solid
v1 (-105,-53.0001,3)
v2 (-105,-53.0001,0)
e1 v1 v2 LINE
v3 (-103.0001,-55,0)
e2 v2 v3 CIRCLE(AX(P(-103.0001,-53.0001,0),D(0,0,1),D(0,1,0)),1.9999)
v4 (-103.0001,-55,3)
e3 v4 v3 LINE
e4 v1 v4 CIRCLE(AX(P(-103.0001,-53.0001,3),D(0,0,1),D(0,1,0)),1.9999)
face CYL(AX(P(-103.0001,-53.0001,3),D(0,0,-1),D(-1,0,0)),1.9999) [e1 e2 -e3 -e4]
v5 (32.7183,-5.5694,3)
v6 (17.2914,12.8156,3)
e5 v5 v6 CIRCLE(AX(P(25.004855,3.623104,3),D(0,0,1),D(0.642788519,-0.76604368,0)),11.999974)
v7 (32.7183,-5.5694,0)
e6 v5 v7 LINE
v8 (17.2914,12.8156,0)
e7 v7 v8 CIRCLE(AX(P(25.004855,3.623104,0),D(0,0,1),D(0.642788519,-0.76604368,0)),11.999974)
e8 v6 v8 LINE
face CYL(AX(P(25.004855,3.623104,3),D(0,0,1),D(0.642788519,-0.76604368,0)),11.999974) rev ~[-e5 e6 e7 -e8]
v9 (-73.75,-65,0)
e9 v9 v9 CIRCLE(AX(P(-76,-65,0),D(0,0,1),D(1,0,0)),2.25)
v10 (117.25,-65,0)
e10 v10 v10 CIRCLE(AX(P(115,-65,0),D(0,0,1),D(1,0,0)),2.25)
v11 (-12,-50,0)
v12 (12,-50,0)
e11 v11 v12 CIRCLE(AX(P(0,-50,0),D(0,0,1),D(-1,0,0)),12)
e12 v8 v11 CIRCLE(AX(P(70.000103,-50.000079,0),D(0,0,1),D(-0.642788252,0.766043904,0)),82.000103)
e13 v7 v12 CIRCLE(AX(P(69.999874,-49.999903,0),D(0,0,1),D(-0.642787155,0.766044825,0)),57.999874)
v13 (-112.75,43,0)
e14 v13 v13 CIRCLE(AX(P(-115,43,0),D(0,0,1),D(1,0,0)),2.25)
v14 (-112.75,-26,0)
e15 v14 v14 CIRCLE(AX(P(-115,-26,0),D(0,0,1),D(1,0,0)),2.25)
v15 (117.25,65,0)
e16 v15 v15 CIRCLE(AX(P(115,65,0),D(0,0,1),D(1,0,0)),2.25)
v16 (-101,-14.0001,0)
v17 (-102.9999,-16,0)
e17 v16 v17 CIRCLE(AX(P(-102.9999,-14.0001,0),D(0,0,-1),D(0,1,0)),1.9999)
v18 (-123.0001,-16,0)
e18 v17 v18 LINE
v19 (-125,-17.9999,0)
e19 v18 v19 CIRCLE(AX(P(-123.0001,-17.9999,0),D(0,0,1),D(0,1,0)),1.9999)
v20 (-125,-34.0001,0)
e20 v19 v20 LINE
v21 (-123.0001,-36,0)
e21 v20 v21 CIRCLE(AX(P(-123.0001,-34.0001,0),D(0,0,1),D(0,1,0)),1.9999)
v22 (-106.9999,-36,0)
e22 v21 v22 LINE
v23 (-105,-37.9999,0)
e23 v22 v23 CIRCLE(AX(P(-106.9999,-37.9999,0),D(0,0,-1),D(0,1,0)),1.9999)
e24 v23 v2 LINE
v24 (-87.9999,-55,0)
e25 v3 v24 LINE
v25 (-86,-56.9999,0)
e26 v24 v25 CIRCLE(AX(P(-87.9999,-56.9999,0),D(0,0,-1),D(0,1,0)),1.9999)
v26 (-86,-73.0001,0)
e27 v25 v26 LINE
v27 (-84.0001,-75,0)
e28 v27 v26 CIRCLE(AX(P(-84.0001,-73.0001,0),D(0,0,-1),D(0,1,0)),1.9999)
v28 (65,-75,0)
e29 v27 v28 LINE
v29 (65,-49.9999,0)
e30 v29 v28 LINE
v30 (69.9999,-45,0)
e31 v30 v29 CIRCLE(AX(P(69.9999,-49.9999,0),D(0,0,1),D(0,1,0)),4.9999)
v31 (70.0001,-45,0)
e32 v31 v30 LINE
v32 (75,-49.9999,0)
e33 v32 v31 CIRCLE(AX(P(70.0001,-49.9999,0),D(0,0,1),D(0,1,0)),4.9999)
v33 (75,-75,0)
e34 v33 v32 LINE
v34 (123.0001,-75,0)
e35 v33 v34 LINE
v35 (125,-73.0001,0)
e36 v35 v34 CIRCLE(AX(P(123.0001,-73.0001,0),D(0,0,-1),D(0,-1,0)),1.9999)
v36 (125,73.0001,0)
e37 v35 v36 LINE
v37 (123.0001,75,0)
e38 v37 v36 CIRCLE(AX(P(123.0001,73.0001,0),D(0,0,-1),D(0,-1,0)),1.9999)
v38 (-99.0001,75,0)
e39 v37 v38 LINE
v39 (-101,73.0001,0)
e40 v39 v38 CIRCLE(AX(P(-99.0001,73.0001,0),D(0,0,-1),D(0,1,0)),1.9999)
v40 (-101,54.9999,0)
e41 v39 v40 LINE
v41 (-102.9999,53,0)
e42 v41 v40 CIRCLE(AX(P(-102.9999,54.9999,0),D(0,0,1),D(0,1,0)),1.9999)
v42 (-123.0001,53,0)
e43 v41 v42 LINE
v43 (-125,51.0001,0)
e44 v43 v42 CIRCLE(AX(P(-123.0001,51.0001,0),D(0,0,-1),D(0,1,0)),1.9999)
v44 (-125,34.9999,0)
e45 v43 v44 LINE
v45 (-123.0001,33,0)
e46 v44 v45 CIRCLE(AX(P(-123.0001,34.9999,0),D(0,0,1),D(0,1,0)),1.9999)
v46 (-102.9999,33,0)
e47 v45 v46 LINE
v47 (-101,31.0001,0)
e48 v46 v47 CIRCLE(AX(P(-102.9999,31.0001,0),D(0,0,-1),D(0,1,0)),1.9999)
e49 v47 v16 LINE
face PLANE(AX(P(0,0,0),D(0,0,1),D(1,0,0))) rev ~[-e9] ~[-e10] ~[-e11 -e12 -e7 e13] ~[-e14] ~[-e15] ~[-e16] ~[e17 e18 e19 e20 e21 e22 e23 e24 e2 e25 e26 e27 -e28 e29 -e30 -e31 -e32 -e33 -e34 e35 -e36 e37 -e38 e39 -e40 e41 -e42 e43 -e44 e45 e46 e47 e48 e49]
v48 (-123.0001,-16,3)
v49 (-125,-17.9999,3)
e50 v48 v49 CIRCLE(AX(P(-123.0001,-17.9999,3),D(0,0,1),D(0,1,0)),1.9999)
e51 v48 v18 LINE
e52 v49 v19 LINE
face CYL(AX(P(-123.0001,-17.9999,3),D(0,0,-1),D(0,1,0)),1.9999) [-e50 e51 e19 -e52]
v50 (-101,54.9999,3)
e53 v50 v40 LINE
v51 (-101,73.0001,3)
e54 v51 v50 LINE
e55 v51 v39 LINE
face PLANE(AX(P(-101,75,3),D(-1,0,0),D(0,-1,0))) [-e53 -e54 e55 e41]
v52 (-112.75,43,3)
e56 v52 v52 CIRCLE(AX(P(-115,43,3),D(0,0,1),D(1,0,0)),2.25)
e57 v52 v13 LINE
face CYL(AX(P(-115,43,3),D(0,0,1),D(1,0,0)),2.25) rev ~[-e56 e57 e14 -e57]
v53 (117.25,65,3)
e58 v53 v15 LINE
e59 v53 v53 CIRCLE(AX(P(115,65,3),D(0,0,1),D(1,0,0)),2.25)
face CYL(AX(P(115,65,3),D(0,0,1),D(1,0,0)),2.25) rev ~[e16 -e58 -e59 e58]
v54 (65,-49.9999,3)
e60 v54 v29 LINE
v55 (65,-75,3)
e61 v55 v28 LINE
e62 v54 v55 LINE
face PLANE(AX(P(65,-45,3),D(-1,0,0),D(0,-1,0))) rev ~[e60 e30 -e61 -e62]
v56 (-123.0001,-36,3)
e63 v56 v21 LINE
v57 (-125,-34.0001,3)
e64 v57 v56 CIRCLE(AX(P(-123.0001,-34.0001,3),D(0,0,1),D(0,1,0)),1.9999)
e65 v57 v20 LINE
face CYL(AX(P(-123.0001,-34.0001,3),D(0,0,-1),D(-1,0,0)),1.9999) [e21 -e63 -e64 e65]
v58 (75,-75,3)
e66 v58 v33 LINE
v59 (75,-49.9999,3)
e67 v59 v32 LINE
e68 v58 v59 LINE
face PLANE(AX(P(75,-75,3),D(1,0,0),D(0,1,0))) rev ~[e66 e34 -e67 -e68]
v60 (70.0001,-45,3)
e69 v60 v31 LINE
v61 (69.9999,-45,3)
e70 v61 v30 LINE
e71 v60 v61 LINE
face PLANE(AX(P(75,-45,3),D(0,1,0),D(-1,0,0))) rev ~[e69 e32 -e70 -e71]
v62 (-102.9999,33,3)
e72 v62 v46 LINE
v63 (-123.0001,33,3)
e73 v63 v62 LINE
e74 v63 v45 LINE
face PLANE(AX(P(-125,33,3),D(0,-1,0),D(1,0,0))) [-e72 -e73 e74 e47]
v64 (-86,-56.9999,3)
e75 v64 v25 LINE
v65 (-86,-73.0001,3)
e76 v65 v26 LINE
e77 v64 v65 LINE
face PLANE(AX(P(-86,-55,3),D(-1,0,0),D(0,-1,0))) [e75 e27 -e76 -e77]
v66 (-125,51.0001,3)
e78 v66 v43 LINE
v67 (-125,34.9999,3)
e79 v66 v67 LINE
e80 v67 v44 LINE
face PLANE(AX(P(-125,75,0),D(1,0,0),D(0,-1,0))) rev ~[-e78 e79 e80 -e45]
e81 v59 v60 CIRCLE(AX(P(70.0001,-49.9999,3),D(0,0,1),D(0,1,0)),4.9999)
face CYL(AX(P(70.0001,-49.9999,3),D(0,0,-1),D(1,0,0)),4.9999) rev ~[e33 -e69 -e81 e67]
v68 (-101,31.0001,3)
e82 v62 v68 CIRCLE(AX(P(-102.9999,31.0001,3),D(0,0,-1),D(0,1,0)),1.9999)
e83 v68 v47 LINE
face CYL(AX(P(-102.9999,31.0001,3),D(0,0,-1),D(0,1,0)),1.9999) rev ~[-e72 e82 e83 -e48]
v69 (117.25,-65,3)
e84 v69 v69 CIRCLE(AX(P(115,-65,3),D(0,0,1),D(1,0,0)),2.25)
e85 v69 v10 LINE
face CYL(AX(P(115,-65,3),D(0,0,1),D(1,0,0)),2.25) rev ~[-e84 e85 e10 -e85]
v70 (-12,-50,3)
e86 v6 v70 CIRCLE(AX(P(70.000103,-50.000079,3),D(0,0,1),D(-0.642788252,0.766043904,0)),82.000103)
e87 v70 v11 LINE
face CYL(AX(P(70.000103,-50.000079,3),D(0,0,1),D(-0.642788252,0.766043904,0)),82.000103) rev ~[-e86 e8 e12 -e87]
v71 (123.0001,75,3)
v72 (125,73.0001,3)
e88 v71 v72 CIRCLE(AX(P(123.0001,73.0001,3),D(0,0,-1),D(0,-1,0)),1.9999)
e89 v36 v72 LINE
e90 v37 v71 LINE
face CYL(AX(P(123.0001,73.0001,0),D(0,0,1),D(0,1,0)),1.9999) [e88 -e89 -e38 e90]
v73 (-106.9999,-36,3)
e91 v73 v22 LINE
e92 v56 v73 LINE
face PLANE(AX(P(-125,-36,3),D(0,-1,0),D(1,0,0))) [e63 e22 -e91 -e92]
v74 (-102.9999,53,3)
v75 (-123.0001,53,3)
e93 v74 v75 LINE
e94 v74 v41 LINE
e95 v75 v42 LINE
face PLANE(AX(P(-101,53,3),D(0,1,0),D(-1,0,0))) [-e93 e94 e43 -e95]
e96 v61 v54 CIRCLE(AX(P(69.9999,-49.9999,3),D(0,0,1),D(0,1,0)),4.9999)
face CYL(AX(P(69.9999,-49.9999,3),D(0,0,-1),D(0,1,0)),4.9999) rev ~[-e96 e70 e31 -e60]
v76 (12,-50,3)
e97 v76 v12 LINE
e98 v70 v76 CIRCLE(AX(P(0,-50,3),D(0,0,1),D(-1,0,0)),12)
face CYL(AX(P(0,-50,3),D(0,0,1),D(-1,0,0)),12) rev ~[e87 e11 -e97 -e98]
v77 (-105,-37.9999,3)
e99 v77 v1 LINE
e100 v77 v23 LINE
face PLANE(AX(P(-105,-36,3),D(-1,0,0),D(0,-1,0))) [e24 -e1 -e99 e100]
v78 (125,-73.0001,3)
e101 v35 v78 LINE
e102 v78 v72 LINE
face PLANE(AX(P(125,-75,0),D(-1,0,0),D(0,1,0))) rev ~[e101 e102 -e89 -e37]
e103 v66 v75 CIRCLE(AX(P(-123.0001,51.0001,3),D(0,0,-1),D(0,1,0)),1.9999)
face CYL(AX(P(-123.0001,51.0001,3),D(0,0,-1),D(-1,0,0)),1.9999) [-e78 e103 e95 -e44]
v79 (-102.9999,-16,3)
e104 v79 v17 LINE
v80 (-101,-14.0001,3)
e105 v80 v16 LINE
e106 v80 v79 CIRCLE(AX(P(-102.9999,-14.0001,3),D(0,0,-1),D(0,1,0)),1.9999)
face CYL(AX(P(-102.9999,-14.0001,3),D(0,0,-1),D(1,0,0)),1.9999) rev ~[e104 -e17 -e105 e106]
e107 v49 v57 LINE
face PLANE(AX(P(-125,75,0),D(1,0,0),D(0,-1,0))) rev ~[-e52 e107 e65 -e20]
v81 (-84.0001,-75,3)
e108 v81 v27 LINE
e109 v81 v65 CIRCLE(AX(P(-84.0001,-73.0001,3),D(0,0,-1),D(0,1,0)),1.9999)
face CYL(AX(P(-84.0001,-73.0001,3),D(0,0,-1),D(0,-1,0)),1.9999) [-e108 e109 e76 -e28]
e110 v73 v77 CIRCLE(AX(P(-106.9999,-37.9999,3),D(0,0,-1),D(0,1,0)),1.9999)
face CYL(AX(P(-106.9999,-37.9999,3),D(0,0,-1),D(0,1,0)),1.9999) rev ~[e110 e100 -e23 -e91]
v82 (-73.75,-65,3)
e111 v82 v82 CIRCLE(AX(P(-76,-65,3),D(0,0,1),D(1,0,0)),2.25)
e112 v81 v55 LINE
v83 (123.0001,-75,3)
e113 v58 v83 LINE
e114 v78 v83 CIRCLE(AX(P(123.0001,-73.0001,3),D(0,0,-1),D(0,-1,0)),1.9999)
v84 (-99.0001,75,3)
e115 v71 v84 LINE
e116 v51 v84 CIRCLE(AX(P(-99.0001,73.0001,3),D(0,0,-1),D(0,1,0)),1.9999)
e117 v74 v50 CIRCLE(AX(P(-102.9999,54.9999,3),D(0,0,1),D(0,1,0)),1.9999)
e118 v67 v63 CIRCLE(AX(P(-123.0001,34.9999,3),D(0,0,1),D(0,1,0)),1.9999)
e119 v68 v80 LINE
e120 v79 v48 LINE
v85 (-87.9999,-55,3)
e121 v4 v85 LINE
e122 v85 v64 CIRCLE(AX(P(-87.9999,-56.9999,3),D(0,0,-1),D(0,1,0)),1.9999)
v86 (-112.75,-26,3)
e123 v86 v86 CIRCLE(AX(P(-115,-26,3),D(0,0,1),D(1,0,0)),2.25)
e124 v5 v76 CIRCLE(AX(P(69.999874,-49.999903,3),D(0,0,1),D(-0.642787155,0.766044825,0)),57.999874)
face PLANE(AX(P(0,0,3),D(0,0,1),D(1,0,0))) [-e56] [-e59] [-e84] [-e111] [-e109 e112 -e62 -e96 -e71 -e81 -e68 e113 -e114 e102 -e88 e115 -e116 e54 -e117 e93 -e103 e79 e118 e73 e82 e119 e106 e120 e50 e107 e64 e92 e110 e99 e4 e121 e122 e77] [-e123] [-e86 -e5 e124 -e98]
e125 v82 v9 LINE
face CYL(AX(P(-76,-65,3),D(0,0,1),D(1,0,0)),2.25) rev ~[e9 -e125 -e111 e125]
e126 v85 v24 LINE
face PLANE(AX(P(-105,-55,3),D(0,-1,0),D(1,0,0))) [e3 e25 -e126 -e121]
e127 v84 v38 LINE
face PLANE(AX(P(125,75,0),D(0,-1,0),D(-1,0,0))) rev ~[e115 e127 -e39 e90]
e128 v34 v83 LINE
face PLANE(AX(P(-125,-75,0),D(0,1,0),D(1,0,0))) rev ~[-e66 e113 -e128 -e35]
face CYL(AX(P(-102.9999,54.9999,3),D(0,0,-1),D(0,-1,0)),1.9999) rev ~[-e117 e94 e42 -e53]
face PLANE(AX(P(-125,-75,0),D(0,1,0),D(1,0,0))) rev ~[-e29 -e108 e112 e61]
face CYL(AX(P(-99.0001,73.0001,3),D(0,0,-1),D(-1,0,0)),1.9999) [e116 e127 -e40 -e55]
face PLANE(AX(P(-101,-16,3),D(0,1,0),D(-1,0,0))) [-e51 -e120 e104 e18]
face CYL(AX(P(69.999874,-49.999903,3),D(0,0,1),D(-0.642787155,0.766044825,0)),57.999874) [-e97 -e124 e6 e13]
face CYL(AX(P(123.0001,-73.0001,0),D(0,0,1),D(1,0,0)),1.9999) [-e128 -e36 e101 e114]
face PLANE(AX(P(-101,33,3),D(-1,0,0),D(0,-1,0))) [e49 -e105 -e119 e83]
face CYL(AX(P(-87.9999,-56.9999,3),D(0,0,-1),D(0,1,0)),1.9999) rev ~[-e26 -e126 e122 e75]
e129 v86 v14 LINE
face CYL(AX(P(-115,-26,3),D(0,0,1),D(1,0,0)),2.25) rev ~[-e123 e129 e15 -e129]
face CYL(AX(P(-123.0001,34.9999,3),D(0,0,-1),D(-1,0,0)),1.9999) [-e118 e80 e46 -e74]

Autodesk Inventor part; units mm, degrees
ref_plane "YZ Plane" through (0, 0, 0) normal (1, 0, 0) x (0, 1, 0)
ref_plane "XZ Plane" through (0, 0, 0) normal (0, 1, 0) x (-1, 0, 0)
ref_plane "XY Plane" through (0, 0, 0) normal (0, 0, 1) x (1, 0, 0)
sketch "Sketch1" plane through (0, 0, 0) normal (0, 0, 1) x (1, 0, 0)
  line L0 (-125, -75) -> (125, -75)
  line L1 (125, -75) -> (125, 75)
  line L2 (125, 75) -> (-125, 75)
  line L3 (-125, 75) -> (-125, -75)
  line L4 (-125, -75) -> (125, 75) construction
  line L5 (125, -75) -> (-125, 75) construction
  point P0 (0, 0)
  dimension "d0" = 150
  dimension "d1" = 250
extrude "Extrusion1" add sketch "Sketch1" along normal blind 3
sketch "Sketch2" plane through (0, 0, 3) normal (0, 0, 1) x (1, 0, 0)
  line L0 (125, -75) -> (125, 75) construction
  line L1 (125, 75) -> (-125, 75) construction
  line L2 (-125, 75) -> (-125, -75) construction
  line L3 (-125, -75) -> (125, -75) construction
  line L4 (-125, -36) -> (-105, -36)
  line L5 (-105, -36) -> (-105, -55)
  line L6 (-105, -55) -> (-86, -55)
  line L7 (-86, -55) -> (-86, -75)
  line L8 (-125, -75) -> (125, -75) construction
  line L9 (-125, 75) -> (-125, -75) construction
  line L10 (-125, -36) -> (-125, -75)
  line L11 (-86, -75) -> (-125, -75)
  line L12 (-125, 33) -> (-101, 33)
  line L13 (-101, 33) -> (-101, -16)
  line L14 (-101, -16) -> (-125, -16)
  line L15 (-125, -16) -> (-125, 33)
  line L16 (65, -75) -> (75, -75)
  line L17 (75, -75) -> (75, -45)
  line L18 (75, -45) -> (65, -45)
  line L19 (65, -45) -> (65, -75)
  line L20 (125, 75) -> (-125, 75) projected
  line L21 (-125, 75) -> (-101, 75)
  line L22 (-101, 75) -> (-101, 53)
  line L23 (-101, 53) -> (-125, 53)
  line L24 (-125, 53) -> (-125, 75)
  point P0 (0, 0)
  dimension "d4" = 39
  dimension "d5" = 39
  dimension "d6" = 20
  dimension "d7" = 20
  dimension "d9" = 24
  dimension "d11" = 20
  dimension "d13" = 10
  dimension "d14" = 30
  dimension "d36" = 50
  dimension "d37" = 22
  dimension "d39" = 42
extrude "Extrusion2" cut sketch "Sketch2" against normal blind 3
sketch "Sketch3" plane through (0, 0, 3) normal (0, 0, 1) x (1, 0, 0)
  circle A0 centre (-115, 43) radius 2.25
  circle A1 centre (-115, -26) radius 2.25
  circle A2 centre (115, 65) radius 2.25
  circle A3 centre (115, -65) radius 2.25
  circle A4 centre (-76, -65) radius 2.25
  line L0 (125, 75) -> (-125, 75) projected
  line L1 (-125, 75) -> (-125, 33) projected
  line L2 (-125, -16) -> (-125, -36) projected
  line L3 (-125, -36) -> (-105, -36) projected
  line L4 (-86, -75) -> (65, -75) projected
  line L5 (-86, -55) -> (-86, -75) projected
  line L6 (75, -75) -> (125, -75) projected
  line L7 (125, -75) -> (125, 75) projected
  line L8 (-125, 53) -> (-101, 53) projected
  point P0 (0, 0)
  dimension "d17" = 4.5
  dimension "d18" = 4.5
  dimension "d19" = 4.5
  dimension "d20" = 4.5
  dimension "d21" = 4.5
  dimension "d23" = 10
  dimension "d24" = 10
  dimension "d25" = 10
  dimension "d26" = 10
  dimension "d27" = 10
  dimension "d28" = 10
  dimension "d29" = 10
  dimension "d30" = 10
  dimension "d31" = 10
  dimension "d38" = 10
extrude "Extrusion3" cut sketch "Sketch3" against normal through all
fillet "Fillet1" radius 2 14 edges at (125, 75, 1.5) (125, -75, 1.5) (-86, -75, 1.5) (-86, -55, 1.5) (-105, -55, 1.5) (-105, -36, 1.5) (-125, -36, 1.5) (-125, -16, 1.5) (-101, -16, 1.5) (-101, 33, 1.5) (-125, 33, 1.5) (-125, 53, 1.5) (-101, 53, 1.5) (-101, 75, 1.5)
fillet "Fillet1" radius 5 2 edges at (65, -45, 1.5) (75, -45, 1.5)
sketch "Sketch4" plane through (0, 0, 3) normal (0, 0, 1) x (1, 0, 0)
  circle A0 centre (70, -50) radius 70 construction
  arc A1 (75, -50) -> (65, -50) centre (70, -50) ccw projected
  arc A2 (25.0049, 3.6231) -> (0, -50) centre (70, -50) ccw construction
  arc A3 (17.2914, 12.8156) -> (-12, -50) centre (70, -50) ccw
  arc A4 (32.7183, -5.5694) -> (12, -50) centre (70, -50) ccw
  arc A5 (32.7183, -5.5694) -> (17.2914, 12.8156) centre (25.0049, 3.6231) ccw
  arc A6 (-12, -50) -> (12, -50) centre (0, -50) ccw
  line L0 (70, -50) -> (-9.4291, 44.6599) construction
  line L1 (-84, -75) -> (65, -75) projected
  arc A7 (75, -50) -> (65, -50) centre (70, -50) ccw projected
  line L2 (70, -50) -> (-137.9858, -50) construction
  point P0 (0, 0)
  dimension "d40" = 140
  dimension "d43" = 50
  dimension "d44" = 12
extrude "Extrusion4" cut sketch "Sketch4" against normal through all
sketch "Sketch5" plane through (0, 0, 3) normal (0, 0, 1) x (1, 0, 0)
  arc A0 (-12, -50) -> (12, -50) centre (0, -50) ccw projected
  arc A1 (17.2914, 12.8156) -> (-12, -50) centre (70, -50) ccw projected
  arc A2 (32.7183, -5.5694) -> (17.2914, 12.8156) centre (25.0049, 3.6231) ccw projected
  arc A3 (32.7183, -5.5694) -> (12, -50) centre (70, -50) ccw projected
  arc A4 (-99, 75) -> (-101, 73) centre (-99, 73) ccw projected
  line L0 (-101, 73) -> (-101, 55) projected
  arc A5 (-103, 53) -> (-101, 55) centre (-103, 55) ccw projected
  line L1 (-103, 53) -> (-123, 53) projected
  arc A6 (-123, 53) -> (-125, 51) centre (-123, 51) ccw projected
  line L2 (-125, 51) -> (-125, 35) projected
  arc A7 (-125, 35) -> (-123, 33) centre (-123, 35) ccw projected
  line L3 (-123, 33) -> (-103, 33) projected
  arc A8 (-101, 31) -> (-103, 33) centre (-103, 31) ccw projected
  line L4 (-101, 31) -> (-101, -14) projected
  arc A9 (-103, -16) -> (-101, -14) centre (-103, -14) ccw projected
  line L5 (-103, -16) -> (-123, -16) projected
  arc A10 (-123, -16) -> (-125, -18) centre (-123, -18) ccw projected
  line L6 (-125, -18) -> (-125, -34) projected
  arc A11 (-125, -34) -> (-123, -36) centre (-123, -34) ccw projected
  line L7 (-123, -36) -> (-107, -36) projected
  arc A12 (-105, -38) -> (-107, -36) centre (-107, -38) ccw projected
  line L8 (-105, -38) -> (-105, -53) projected
  arc A13 (-105, -53) -> (-103, -55) centre (-103, -53) ccw projected
  line L9 (-103, -55) -> (-88, -55) projected
  arc A14 (-86, -57) -> (-88, -55) centre (-88, -57) ccw projected
  line L10 (-86, -57) -> (-86, -73) projected
  arc A15 (-86, -73) -> (-84, -75) centre (-84, -73) ccw projected
  line L11 (-84, -75) -> (65, -75) projected
  line L12 (65, -75) -> (65, -50) projected
  arc A16 (75, -50) -> (65, -50) centre (70, -50) ccw projected
  line L13 (75, -50) -> (75, -75) projected
  line L14 (75, -75) -> (123, -75) projected
  arc A17 (123, -75) -> (125, -73) centre (123, -73) ccw projected
  line L15 (125, -73) -> (125, 73) projected
  arc A18 (125, 73) -> (123, 75) centre (123, 73) ccw projected
  line L16 (123, 75) -> (-99, 75) projected
  circle A19 centre (-115, 43) radius 2.25 projected
  circle A20 centre (115, 65) radius 2.25 projected
  circle A21 centre (-115, -26) radius 2.25 projected
  circle A22 centre (115, -65) radius 2.25 projected
  circle A23 centre (-76, -65) radius 2.25 projected
  point P0 (0, 0)
equation "\"d5\" = d4"
equation "\"d18\" = d17"
equation "\"d19\" = d17"
equation "\"d20\" = d17"
equation "\"d21\" = d17"
equation "\"d24\" = d23"
equation "\"d25\" = d23"
equation "\"d26\" = d25"
equation "\"d27\" = d25"
equation "\"d28\" = d26"
equation "\"d29\" = d26"
equation "\"d30\" = d23"
equation "\"d31\" = d23"
equation "\"d38\" = d23"
properties part number "SideAcrylicSheet_WithOpening"
